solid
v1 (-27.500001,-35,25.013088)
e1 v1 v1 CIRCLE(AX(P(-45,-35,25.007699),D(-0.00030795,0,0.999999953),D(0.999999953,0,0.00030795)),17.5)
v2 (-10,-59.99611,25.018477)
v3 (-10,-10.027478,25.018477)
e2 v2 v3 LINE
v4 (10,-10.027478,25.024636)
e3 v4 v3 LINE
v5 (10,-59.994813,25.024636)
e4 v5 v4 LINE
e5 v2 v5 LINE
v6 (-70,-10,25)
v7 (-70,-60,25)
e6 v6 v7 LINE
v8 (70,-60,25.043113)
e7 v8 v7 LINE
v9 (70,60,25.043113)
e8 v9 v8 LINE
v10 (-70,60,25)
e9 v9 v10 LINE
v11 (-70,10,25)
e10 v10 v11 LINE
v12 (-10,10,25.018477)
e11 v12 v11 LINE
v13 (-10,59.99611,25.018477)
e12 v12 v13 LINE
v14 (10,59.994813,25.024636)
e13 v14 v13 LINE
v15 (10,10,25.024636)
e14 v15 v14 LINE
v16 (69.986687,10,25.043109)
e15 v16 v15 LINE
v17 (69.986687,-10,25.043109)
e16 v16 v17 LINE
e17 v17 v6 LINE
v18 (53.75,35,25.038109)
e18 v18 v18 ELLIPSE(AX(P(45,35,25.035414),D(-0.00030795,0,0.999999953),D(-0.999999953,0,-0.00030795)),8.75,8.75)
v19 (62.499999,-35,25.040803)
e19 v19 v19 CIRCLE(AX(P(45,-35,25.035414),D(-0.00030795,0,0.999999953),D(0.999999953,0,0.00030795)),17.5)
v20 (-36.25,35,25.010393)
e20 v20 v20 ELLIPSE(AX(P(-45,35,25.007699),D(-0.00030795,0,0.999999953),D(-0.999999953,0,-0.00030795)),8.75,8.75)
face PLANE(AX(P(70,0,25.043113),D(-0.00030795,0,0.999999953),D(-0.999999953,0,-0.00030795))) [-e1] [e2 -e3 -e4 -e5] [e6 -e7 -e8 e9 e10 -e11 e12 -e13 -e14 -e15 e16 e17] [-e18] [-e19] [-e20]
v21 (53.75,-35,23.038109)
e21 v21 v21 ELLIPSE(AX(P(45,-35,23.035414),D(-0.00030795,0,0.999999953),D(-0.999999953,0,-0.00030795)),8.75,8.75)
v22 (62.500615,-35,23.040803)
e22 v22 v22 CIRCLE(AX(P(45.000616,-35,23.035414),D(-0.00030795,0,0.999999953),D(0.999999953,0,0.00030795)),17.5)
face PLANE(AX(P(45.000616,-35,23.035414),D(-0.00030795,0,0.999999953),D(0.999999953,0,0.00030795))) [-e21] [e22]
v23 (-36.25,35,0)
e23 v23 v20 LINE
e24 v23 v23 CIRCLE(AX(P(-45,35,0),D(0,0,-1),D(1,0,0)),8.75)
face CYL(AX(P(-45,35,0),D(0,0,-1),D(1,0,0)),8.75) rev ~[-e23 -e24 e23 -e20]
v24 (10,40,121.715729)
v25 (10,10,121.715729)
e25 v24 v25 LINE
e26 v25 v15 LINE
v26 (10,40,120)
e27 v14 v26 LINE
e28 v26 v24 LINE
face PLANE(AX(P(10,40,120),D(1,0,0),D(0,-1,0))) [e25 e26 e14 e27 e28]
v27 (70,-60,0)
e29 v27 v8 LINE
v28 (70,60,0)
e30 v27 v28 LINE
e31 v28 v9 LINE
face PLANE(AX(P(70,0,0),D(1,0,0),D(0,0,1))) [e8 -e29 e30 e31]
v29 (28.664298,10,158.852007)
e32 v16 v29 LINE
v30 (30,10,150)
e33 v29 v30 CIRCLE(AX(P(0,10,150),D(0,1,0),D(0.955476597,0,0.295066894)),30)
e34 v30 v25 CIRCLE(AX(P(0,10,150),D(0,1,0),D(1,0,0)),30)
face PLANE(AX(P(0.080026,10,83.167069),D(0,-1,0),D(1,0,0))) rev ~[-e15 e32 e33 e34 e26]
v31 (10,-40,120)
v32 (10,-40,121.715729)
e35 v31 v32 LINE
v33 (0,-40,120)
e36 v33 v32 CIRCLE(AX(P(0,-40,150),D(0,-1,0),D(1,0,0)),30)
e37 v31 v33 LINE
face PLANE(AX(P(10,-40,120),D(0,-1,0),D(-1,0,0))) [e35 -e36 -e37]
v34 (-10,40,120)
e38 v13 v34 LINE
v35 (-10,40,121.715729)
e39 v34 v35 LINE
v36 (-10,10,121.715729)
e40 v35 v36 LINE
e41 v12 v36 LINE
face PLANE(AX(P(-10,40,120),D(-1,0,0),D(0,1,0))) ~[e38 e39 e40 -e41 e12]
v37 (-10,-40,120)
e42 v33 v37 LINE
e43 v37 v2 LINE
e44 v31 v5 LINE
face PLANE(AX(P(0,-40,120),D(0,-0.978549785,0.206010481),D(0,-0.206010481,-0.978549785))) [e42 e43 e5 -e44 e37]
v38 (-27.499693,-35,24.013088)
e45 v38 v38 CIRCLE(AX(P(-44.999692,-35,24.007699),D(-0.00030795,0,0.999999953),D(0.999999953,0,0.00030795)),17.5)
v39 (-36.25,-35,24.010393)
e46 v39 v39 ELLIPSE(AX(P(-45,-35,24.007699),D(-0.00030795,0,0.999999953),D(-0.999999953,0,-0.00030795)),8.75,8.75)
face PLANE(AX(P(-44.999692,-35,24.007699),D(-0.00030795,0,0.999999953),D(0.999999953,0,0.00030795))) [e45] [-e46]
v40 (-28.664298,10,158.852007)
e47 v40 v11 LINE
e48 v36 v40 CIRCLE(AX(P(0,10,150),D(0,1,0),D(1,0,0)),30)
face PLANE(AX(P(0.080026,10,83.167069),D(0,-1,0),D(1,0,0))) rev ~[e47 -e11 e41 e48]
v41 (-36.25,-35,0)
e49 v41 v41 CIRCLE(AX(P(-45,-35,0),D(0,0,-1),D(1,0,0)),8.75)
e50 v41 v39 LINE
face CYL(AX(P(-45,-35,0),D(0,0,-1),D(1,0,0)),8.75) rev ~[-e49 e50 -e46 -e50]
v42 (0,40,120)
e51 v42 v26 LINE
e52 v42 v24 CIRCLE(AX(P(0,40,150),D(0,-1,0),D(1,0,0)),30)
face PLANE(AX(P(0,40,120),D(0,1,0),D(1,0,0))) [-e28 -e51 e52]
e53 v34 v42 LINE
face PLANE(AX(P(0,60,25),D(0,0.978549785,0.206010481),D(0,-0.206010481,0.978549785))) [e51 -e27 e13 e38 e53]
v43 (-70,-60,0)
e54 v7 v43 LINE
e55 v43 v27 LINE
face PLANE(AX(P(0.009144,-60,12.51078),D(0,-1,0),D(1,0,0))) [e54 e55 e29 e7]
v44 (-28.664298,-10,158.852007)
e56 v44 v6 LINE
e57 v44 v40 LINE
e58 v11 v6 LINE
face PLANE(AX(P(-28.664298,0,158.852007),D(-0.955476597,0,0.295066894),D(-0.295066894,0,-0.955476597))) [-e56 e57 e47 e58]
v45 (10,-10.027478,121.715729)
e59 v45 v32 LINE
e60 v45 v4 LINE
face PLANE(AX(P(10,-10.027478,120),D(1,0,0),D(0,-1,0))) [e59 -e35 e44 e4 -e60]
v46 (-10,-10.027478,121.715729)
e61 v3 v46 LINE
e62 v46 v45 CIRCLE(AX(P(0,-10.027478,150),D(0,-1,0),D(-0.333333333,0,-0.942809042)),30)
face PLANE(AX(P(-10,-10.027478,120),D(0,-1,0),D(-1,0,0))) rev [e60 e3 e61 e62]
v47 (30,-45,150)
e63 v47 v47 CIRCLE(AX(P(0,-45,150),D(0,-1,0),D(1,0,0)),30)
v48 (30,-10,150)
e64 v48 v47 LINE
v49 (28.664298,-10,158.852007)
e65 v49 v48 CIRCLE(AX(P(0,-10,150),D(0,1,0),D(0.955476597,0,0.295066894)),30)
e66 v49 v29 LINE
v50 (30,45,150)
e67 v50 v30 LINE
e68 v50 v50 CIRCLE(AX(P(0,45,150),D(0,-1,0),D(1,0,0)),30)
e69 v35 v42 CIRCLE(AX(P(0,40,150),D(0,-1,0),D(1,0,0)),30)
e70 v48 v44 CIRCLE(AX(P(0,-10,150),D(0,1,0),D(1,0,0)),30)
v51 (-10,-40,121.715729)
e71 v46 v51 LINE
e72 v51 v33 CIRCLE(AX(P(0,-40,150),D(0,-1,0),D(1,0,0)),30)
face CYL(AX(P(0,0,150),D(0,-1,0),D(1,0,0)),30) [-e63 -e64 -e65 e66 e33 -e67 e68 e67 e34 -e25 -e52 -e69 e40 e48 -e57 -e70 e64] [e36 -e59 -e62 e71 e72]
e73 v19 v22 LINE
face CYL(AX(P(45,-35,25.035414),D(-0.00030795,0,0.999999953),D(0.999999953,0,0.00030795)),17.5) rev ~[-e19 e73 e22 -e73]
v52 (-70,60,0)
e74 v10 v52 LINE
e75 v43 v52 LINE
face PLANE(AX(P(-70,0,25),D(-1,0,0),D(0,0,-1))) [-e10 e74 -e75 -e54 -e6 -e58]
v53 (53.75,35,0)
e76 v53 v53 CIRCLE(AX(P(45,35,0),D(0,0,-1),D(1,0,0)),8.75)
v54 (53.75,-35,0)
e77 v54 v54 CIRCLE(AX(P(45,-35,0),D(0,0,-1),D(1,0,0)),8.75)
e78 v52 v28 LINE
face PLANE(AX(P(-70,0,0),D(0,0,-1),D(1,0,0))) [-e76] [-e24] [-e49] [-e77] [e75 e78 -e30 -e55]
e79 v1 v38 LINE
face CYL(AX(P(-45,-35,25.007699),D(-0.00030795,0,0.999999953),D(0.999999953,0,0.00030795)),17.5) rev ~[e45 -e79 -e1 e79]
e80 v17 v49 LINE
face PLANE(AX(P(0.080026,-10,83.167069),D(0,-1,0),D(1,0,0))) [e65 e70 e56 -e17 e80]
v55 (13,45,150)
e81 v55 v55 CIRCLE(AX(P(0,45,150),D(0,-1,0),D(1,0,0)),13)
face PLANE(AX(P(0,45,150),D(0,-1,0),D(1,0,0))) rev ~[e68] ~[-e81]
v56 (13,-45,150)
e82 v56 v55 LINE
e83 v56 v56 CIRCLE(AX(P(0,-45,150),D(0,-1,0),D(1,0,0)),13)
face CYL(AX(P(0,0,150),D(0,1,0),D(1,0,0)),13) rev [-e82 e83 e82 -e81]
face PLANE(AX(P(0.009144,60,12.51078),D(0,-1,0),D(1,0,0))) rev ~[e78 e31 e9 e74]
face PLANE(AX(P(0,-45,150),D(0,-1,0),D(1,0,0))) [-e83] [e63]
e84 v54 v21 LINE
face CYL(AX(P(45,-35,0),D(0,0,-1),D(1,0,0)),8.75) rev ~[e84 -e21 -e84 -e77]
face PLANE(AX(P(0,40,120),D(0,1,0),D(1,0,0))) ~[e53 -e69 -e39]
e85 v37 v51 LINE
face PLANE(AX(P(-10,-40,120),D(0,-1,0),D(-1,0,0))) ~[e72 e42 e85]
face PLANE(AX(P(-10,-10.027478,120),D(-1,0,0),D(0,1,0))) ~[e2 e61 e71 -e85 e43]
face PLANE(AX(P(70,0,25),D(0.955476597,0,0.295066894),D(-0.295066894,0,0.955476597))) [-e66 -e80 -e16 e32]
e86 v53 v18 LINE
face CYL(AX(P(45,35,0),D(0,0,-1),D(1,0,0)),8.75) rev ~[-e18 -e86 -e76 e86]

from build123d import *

# Parameters (mm, degrees)
F1_DEPTH  = 10
F3_DEPTH  = 60
F4_R      = 30
F4_R_2    = 13
F5_DEPTH  = 45
F7_DEPTH  = 10
F8_DEPTH  = 10
F9_DEPTH  = 5
F10_DEPTH = 5
F11_R     = 8.75
F12_DEPTH = 50
F13_R     = 17.5
F14_DEPTH = 1
F15_R     = 17.5
F16_DEPTH = 2


# Not quite as in the source:
# - a pattern or mirror of a feature is missing from the dataset's text; its kind, count and spacing are read off the source's solid


with BuildPart() as f1:
    # F0 (on Front) → F1 (new body, symmetric)
    with BuildSketch(Plane.XZ):
        with BuildLine():
            Line((-28.6642979162, 158.8520068331), (-70, 25))
            Line((-70, 25), (70, 25))
            Line((70, 25), (28.6642979162, 158.8520068331))
            ThreePointArc((28.6642979162, 158.8520068331), (29.6641950631, 154.4761067075), (30, 150))
            ThreePointArc((30, 150), (-4.4761067075, 120.3358049369), (-28.6642979162, 158.8520068331))
        make_face()
    extrude(amount=F1_DEPTH, both=True)

    # F2 (on Front) → F3 (join, symmetric)
    with BuildSketch(Plane.XZ):
        Polygon((70, 0), (70, 25.0431130097), (-70, 25), (-70, 0), align=None)
    extrude(amount=F3_DEPTH, both=True)

    # F4 (on Front) → F5 (join, symmetric)
    with BuildSketch(Plane.XZ):
        with Locations((0, 150)):
            Circle(F4_R)
        with Locations((0, 150)):
            Circle(F4_R_2, mode=Mode.SUBTRACT)
    extrude(amount=F5_DEPTH, both=True)

    # F6 (on Right) → F7 (join, symmetric)
    with BuildSketch(Plane.YZ):
        Polygon((60, 25), (40, 120), (10, 120), (10, 25), align=None)
    extrude(amount=F7_DEPTH, both=True)

    # F6 (on Right) → F8, piece 2 (join, symmetric)
    with BuildSketch(Plane.YZ):
        Polygon((-40, 120), (-60, 25), (-10.027478449, 25), (-10.027478449, 120), align=None)
    extrude(amount=F8_DEPTH, both=True)

    # F9 (add): a face of the model
    f9_faces = [f1.faces().sort_by_distance(p)[0] for p in [
        (5, 25, 120),
    ]]


with BuildPart() as f8:
    # F6 (on Right) → F8 (new body, symmetric)
    with BuildSketch(Plane.YZ):
        Polygon((60, 25), (40, 120), (10, 120), (10, 25), align=None)
    extrude(amount=F8_DEPTH, both=True)


with BuildPart() as f1_1:
    add(f1.part)

    add(f8.part)  # F9 merges F8
    f9 = extrude(f9_faces, amount=F9_DEPTH)

    # F9_copies: F9 across plane
    add(f9.mirror(Plane(origin=(0, 0, 0), x_dir=(0, 0, -1), z_dir=(-1, 0, 0))))

    # F10 (add): a face of the model
    f10_faces = [f1_1.faces().sort_by_distance(p)[0] for p in [
        (5, -25.0137392245, 120),
    ]]
    f10 = extrude(f10_faces, amount=F10_DEPTH)

    # F10_copies: F10 across plane
    add(f10.mirror(Plane(origin=(0, 0, 0), x_dir=(0, 0, -1), z_dir=(-1, 0, 0))))

    # F11 (on face) → F12 (cut)
    with BuildSketch(Plane(origin=(0, 0, 0), x_dir=(1, 0, 0), z_dir=(0, 0, -1))):
        with Locations((-45, -35)):
            Circle(F11_R)
        with Locations((-45, 35)):
            Circle(F11_R)
        with Locations((45, -35)):
            Circle(F11_R)
        with Locations((45, 35)):
            Circle(F11_R)
    extrude(amount=-F12_DEPTH, mode=Mode.SUBTRACT)

    # F13 (on face) → F14 (cut)
    with BuildSketch(Plane(origin=(-0.0077053893, 0, 25.021554132), x_dir=(0.9999999526, 0, 0.0003079501), z_dir=(-0.0003079501, 0, 0.9999999526))):
        with Locations((-44.992296744, -35)):
            Circle(F13_R)
        with BuildLine():
            add(Edge.make_bspline(
                [(-36.2422963292, -35), (-36.2422963292, -19.8445554338), (-49.3672969515, -27.4222777169), (-62.4922975738, -35), (-49.3672969515, -42.5777222831), (-36.2422963292, -50.1554445662), (-36.2422963292, -35)],
                knots=[3.1415926536, 3.1415926536, 3.1415926536, 5.235987756, 5.235987756, 7.3303828584, 7.3303828584, 9.4247779608, 9.4247779608, 9.4247779608], degree=2, weights=[1, 0.5, 1, 0.5, 1, 0.5, 1]))
        make_face(mode=Mode.SUBTRACT)
        with BuildLine():
            add(Edge.make_bspline(
                [(53.7577079383, -35), (53.7577079383, -19.8445554338), (40.632707316, -27.4222777169), (27.5077066937, -35), (40.632707316, -42.5777222831), (53.7577079383, -50.1554445662), (53.7577079383, -35)],
                knots=[3.1415926536, 3.1415926536, 3.1415926536, 5.235987756, 5.235987756, 7.3303828584, 7.3303828584, 9.4247779608, 9.4247779608, 9.4247779608], degree=2, weights=[1, 0.5, 1, 0.5, 1, 0.5, 1]))
        make_face()
        with BuildLine():
            add(Edge.make_bspline(
                [(-36.2422963292, -35), (-36.2422963292, -19.8445554338), (-49.3672969515, -27.4222777169), (-62.4922975738, -35), (-49.3672969515, -42.5777222831), (-36.2422963292, -50.1554445662), (-36.2422963292, -35)],
                knots=[3.1415926536, 3.1415926536, 3.1415926536, 5.235987756, 5.235987756, 7.3303828584, 7.3303828584, 9.4247779608, 9.4247779608, 9.4247779608], degree=2, weights=[1, 0.5, 1, 0.5, 1, 0.5, 1]))
        make_face()
    extrude(amount=-F14_DEPTH, mode=Mode.SUBTRACT)

    # F15 (on face) → F16 (cut)
    with BuildSketch(Plane(origin=(-0.0077053893, 0, 25.021554132), x_dir=(0.9999999526, 0, 0.0003079501), z_dir=(-0.0003079501, 0, 0.9999999526))):
        with Locations((45.0077075234, -35)):
            Circle(F15_R)
        with BuildLine():
            add(Edge.make_bspline(
                [(53.7577079383, -35), (53.7577079383, -19.8445554338), (40.632707316, -27.4222777169), (27.5077066937, -35), (40.632707316, -42.5777222831), (53.7577079383, -50.1554445662), (53.7577079383, -35)],
                knots=[3.1415926536, 3.1415926536, 3.1415926536, 5.235987756, 5.235987756, 7.3303828584, 7.3303828584, 9.4247779608, 9.4247779608, 9.4247779608], degree=2, weights=[1, 0.5, 1, 0.5, 1, 0.5, 1]))
        make_face(mode=Mode.SUBTRACT)
        with BuildLine():
            add(Edge.make_bspline(
                [(53.7577079383, -35), (53.7577079383, -19.8445554338), (40.632707316, -27.4222777169), (27.5077066937, -35), (40.632707316, -42.5777222831), (53.7577079383, -50.1554445662), (53.7577079383, -35)],
                knots=[3.1415926536, 3.1415926536, 3.1415926536, 5.235987756, 5.235987756, 7.3303828584, 7.3303828584, 9.4247779608, 9.4247779608, 9.4247779608], degree=2, weights=[1, 0.5, 1, 0.5, 1, 0.5, 1]))
        make_face()
    extrude(amount=-F16_DEPTH, mode=Mode.SUBTRACT)


solid = f1_1.part
